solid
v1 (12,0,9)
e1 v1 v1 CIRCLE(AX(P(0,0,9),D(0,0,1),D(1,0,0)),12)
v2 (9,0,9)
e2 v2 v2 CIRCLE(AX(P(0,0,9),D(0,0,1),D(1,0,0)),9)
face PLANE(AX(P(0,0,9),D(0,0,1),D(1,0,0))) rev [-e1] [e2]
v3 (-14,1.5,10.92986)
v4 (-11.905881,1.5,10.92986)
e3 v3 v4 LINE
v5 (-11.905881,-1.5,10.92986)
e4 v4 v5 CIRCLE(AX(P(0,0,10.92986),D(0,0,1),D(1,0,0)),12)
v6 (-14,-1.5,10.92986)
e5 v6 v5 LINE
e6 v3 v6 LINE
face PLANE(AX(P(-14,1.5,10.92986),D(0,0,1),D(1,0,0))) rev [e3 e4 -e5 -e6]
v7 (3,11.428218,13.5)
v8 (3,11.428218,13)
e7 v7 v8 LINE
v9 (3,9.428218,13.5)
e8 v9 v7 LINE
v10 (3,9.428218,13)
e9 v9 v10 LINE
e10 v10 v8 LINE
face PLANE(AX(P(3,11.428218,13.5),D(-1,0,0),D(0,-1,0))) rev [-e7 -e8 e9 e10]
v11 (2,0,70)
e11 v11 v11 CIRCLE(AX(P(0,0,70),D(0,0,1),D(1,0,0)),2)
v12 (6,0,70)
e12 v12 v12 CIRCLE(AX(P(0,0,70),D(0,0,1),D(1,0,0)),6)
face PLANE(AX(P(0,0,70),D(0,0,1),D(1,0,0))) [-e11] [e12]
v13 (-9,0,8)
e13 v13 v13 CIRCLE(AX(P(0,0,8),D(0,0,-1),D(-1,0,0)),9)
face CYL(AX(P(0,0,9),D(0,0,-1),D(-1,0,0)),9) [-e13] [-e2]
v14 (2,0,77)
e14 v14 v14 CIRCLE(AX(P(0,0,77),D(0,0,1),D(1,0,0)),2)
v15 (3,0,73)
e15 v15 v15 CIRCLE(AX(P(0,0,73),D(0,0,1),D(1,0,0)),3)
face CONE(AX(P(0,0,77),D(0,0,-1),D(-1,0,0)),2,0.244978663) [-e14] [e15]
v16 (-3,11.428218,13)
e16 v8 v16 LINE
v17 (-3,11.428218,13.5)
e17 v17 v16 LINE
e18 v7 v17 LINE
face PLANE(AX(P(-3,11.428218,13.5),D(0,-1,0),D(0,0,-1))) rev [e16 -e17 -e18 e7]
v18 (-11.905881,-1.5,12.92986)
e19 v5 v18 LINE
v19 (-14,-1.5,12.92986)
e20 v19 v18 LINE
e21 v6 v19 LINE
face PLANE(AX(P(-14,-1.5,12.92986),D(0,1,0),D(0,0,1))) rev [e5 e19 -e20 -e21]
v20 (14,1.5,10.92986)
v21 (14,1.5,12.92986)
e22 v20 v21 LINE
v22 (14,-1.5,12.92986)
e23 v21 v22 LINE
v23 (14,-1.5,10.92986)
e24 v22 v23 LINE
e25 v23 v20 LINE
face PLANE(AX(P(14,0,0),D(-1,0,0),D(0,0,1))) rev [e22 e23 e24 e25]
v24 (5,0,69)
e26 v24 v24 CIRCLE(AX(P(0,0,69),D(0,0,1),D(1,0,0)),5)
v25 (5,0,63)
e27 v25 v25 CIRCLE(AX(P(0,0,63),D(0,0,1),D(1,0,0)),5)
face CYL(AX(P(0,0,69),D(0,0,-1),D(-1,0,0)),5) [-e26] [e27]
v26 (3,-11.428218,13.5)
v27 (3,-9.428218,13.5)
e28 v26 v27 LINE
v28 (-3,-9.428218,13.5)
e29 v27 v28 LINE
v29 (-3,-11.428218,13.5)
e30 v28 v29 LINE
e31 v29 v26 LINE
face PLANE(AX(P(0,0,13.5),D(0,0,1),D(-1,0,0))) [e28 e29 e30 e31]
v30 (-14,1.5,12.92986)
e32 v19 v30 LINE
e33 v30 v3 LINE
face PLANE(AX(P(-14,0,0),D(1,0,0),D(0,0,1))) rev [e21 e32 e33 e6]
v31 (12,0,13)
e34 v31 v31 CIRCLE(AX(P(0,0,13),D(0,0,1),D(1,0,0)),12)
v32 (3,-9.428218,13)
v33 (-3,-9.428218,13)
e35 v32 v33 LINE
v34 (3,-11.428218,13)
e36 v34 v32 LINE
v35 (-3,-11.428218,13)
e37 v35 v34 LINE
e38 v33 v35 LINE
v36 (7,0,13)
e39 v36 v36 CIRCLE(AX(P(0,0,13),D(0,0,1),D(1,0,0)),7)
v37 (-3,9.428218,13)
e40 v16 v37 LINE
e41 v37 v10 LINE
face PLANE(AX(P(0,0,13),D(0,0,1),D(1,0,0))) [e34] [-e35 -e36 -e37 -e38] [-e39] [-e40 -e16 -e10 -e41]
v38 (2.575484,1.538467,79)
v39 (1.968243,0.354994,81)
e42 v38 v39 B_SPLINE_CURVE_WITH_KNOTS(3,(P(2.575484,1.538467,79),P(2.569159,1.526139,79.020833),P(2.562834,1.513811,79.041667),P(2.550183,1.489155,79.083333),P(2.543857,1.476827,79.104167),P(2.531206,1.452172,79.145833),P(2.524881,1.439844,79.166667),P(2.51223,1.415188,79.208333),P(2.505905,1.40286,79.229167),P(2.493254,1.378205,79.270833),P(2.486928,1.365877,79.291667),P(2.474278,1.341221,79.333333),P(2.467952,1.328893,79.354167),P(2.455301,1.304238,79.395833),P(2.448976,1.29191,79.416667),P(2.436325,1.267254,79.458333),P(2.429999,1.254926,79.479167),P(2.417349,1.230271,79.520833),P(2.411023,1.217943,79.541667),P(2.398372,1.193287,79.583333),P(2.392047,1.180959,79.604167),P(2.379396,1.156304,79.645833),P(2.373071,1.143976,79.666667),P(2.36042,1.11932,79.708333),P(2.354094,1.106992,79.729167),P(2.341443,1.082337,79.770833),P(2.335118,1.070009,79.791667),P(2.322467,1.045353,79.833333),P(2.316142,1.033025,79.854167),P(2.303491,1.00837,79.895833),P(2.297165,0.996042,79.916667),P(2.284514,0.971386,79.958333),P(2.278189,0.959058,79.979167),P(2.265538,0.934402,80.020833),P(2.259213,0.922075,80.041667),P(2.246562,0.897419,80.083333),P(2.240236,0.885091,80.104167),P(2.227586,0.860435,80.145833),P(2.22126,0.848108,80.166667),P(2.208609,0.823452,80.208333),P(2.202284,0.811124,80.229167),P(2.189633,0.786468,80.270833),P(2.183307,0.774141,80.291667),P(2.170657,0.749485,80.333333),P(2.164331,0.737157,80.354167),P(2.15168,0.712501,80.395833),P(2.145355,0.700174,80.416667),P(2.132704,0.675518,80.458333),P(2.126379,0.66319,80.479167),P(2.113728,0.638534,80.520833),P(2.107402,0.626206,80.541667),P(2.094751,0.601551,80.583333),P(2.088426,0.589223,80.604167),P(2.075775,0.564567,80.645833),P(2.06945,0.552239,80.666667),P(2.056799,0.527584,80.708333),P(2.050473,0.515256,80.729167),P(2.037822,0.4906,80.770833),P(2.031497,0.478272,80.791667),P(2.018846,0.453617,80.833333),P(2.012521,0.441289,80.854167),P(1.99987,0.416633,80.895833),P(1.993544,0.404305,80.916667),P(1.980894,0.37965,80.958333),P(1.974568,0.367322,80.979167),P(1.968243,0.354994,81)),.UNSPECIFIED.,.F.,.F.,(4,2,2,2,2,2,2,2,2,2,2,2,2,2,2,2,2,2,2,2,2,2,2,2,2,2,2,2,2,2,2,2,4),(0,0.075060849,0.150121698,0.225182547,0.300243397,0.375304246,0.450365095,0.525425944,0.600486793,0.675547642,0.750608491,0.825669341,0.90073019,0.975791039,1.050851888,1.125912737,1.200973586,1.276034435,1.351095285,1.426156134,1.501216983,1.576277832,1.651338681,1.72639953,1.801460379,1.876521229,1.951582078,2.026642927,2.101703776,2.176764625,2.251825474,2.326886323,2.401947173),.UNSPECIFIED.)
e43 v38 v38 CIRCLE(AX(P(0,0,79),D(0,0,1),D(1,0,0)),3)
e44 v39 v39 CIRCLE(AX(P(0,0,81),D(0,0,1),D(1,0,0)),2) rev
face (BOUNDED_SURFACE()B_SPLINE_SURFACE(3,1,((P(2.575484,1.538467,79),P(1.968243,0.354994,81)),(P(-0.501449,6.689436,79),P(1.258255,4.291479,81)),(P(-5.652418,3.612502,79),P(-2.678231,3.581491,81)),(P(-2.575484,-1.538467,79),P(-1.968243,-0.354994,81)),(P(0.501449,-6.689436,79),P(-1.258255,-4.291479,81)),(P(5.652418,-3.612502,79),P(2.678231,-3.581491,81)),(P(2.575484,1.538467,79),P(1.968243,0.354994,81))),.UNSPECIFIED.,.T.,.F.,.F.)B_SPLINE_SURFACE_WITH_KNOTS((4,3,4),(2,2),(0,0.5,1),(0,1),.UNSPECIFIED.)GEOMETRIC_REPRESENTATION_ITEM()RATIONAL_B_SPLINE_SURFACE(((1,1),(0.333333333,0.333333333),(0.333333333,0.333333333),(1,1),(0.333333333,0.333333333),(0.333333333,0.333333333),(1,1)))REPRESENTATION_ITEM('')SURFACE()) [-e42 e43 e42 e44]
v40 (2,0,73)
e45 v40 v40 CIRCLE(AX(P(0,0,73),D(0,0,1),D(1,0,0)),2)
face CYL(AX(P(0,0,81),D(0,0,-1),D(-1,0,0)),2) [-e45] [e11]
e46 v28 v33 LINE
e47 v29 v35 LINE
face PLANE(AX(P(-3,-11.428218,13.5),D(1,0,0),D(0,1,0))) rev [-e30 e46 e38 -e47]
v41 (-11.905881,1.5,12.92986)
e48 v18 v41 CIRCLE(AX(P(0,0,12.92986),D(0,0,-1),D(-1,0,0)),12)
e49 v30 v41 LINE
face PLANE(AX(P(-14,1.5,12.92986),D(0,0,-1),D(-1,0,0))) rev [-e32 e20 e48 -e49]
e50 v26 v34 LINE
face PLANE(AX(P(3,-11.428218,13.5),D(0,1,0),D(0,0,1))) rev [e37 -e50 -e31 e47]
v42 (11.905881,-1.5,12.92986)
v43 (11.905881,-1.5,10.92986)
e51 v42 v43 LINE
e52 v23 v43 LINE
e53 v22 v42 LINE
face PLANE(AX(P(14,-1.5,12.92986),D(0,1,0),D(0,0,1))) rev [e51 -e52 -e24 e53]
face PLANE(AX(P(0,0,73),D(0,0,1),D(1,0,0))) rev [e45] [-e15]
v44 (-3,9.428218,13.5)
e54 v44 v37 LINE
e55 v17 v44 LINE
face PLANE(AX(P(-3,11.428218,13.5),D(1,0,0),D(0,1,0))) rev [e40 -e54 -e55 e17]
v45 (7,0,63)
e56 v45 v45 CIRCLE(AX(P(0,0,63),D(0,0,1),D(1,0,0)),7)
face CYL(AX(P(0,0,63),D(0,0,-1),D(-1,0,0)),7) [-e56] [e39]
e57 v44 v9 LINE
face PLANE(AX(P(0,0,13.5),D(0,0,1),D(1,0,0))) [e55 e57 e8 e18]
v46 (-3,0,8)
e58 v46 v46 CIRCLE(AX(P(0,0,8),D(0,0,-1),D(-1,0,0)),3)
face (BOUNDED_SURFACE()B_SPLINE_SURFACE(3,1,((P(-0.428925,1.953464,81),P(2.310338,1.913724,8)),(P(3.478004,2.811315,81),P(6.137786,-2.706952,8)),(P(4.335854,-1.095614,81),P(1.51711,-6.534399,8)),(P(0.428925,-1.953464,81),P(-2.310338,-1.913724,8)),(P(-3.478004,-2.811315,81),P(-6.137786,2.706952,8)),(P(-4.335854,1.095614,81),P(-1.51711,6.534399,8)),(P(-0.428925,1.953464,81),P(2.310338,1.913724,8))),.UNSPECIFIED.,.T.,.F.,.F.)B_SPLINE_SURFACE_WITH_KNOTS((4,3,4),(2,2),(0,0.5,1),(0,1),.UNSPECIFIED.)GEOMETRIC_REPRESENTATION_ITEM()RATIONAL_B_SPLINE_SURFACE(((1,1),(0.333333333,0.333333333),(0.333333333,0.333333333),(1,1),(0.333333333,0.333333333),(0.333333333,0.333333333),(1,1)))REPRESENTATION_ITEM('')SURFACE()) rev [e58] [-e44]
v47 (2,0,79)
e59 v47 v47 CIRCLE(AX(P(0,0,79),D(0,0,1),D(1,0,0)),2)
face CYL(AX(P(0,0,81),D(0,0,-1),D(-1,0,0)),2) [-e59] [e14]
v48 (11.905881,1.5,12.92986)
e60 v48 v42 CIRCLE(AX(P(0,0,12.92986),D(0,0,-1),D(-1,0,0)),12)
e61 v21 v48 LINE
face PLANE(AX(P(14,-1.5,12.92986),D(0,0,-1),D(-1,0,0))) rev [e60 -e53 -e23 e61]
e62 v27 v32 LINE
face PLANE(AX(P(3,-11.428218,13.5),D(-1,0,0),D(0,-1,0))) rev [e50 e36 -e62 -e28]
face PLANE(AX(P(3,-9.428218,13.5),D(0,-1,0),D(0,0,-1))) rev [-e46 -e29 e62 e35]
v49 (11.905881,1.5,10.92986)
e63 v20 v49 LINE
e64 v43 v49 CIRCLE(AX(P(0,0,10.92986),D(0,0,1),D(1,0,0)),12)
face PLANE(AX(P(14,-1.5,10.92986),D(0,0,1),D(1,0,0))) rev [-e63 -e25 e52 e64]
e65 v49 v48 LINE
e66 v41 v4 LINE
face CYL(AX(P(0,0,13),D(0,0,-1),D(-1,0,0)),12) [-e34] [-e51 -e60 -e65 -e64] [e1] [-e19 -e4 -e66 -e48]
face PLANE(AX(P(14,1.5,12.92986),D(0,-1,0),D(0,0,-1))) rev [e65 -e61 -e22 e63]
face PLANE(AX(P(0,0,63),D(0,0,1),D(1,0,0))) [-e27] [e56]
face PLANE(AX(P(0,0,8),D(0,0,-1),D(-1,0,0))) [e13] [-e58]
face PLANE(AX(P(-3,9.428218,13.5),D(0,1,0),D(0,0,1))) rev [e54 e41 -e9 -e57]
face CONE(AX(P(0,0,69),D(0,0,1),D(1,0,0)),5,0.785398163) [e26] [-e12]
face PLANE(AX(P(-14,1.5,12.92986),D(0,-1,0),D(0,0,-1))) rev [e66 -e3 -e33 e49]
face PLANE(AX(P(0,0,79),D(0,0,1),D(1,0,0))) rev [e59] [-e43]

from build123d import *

# Parameters (mm, degrees)
SKETCH1_R           = 9
BOSS_EXTRUDE1_DEPTH = 9
SKETCH2_R           = 7
BOSS_EXTRUDE2_DEPTH = 54
SKETCH3_R           = 12
BOSS_EXTRUDE3_DEPTH = 4
SKETCH4_R           = 5
BOSS_EXTRUDE4_DEPTH = 6
SKETCH5_R           = 2
BOSS_EXTRUDE5_DEPTH = 12
SKETCH6_R           = 6
SKETCH9_R           = 3
SKETCH8_R           = 2
SKETCH10_W          = 6
SKETCH10_H          = 2
BOSS_EXTRUDE6_DEPTH = 0.5
SKETCH11_W          = 2
SKETCH11_H          = 3
BOSS_EXTRUDE7_DEPTH = 3
CIRPATTERN2_COUNT   = 2
SKETCH12_R          = 9
CUT_EXTRUDE1_DEPTH  = 8


with BuildPart() as part:
    # Sketch1 → Boss-Extrude1 (new body)
    with BuildSketch(Plane.XY):
        Circle(SKETCH1_R)
    extrude(amount=BOSS_EXTRUDE1_DEPTH)

    # Sketch2 → Boss-Extrude2 (add)
    with BuildSketch(Plane.XY.offset(9)):
        Circle(SKETCH2_R)
    extrude(amount=BOSS_EXTRUDE2_DEPTH)

    # Sketch3 → Boss-Extrude3 (add)
    with BuildSketch(Plane.XY.offset(9)):
        Circle(SKETCH3_R)
    extrude(amount=BOSS_EXTRUDE3_DEPTH)

    # Sketch4 → Boss-Extrude4 (add)
    with BuildSketch(Plane.XY.offset(63)):
        Circle(SKETCH4_R)
    extrude(amount=BOSS_EXTRUDE4_DEPTH)

    # Sketch5 → Boss-Extrude5 (add)
    with BuildSketch(Plane.XY.offset(69)):
        Circle(SKETCH5_R)
    extrude(amount=BOSS_EXTRUDE5_DEPTH)

    # Sketch6 → section 0 of loft1
    with BuildSketch(Plane.XY.offset(70), mode=Mode.PRIVATE) as loft1_s0:
        Circle(SKETCH6_R)
    # loft up to a face of the part (loft1)
    loft([loft1_s0.sketch, Face(Wire([part.edges().sort_by_distance((-3.42273553, 3.644843137, 69))[0]]))])

    # Loft2: read off the stored shape, not the designer's step
    # Loft2: loft between two sections, ruled curve by curve
    loft2_from = [
        Edge.make_bspline([(2.575484484, 1.538466663, 79), (-0.501448843, 6.689435631, 79), (-5.652417811, 3.612502304, 79), (-2.575484484, -1.538466663, 79), (0.501448843, -6.689435631, 79), (5.652417811, -3.612502304, 79), (2.575484484, 1.538466663, 79)], [0, 0, 0, 0, 0.5, 0.5, 0.5, 1, 1, 1, 1], 3, [1, 0.333333333, 0.333333333, 1, 0.333333333, 0.333333333, 1]),
    ]
    loft2_to = [
        Edge.make_bspline([(1.968242689, 0.354993967, 81), (1.258254754, 4.291479346, 81), (-2.678230624, 3.581491411, 81), (-1.968242689, -0.354993967, 81), (-1.258254754, -4.291479346, 81), (2.678230624, -3.581491411, 81), (1.968242689, 0.354993967, 81)], [0, 0, 0, 0, 0.5, 0.5, 0.5, 1, 1, 1, 1], 3, [1, 0.333333333, 0.333333333, 1, 0.333333333, 0.333333333, 1]),
    ]
    loft2 = Solid(Shell([*[Face.make_surface_from_curves(loft2_from[k], loft2_to[k]) for k in range(1)], Face(Wire(loft2_from)), Face(Wire(loft2_to))]))
    add(loft2)

    # Sketch9 → Loft3 section 0
    with BuildSketch(Plane.XY.offset(73)):
        Circle(SKETCH9_R)
    # Sketch8 → Loft3 section 1
    with BuildSketch(Plane.XY.offset(77)):
        Circle(SKETCH8_R)
    loft()

    # Sketch10 → Boss-Extrude6 (add)
    with BuildSketch(Plane.XY.offset(13)):
        with Locations((0, 10.428217705)):
            Rectangle(SKETCH10_W, SKETCH10_H)
    boss_extrude6 = extrude(amount=BOSS_EXTRUDE6_DEPTH)

    # Sketch11 → Boss-Extrude7 (add)
    with BuildSketch(Plane(origin=(11, 0, 0), x_dir=(0, 0, -1), z_dir=(1, 0, 0))):
        with Locations((-11.929859907, 0)):
            Rectangle(SKETCH11_W, SKETCH11_H)
    boss_extrude7 = extrude(amount=BOSS_EXTRUDE7_DEPTH)

    # CirPattern2: Boss-Extrude6, Boss-Extrude7 ×2 about axis
    cirpattern2_axis = Axis((0, 0, 0), (0, 0, 1))
    add([boss_extrude6.rotate(cirpattern2_axis, i * 360 / CIRPATTERN2_COUNT) for i in range(1, CIRPATTERN2_COUNT)])
    add([boss_extrude7.rotate(cirpattern2_axis, i * 360 / CIRPATTERN2_COUNT) for i in range(1, CIRPATTERN2_COUNT)])

    # Sketch12 → Cut-Extrude1 (cut)
    with BuildSketch(Plane(origin=(0, 0, 0), x_dir=(-1, 0, 0), z_dir=(0, 0, -1))):
        Circle(SKETCH12_R)
    extrude(amount=-CUT_EXTRUDE1_DEPTH, mode=Mode.SUBTRACT)

    # Cut-Loft1: read off the stored shape, not the designer's step
    # Cut-Loft1: loft between two sections, ruled curve by curve
    cut_loft1_from = [
        Edge.make_bspline([(-0.428925161, 1.953464411, 81), (3.478003662, 2.811314733, 81), (4.335853984, -1.09561409, 81), (0.428925161, -1.953464411, 81), (-3.478003662, -2.811314733, 81), (-4.335853984, 1.09561409, 81), (-0.428925161, 1.953464411, 81)], [0, 0, 0, 0, 0.5, 0.5, 0.5, 1, 1, 1, 1], 3, [1, 0.333333333, 0.333333333, 1, 0.333333333, 0.333333333, 1]),
    ]
    cut_loft1_to = [
        Edge.make_bspline([(2.310337756, 1.913723975, 8), (6.137785706, -2.706951537, 8), (1.517110194, -6.534399487, 8), (-2.310337756, -1.913723975, 8), (-6.137785706, 2.706951537, 8), (-1.517110194, 6.534399487, 8), (2.310337756, 1.913723975, 8)], [0, 0, 0, 0, 0.5, 0.5, 0.5, 1, 1, 1, 1], 3, [1, 0.333333333, 0.333333333, 1, 0.333333333, 0.333333333, 1]),
    ]
    cut_loft1 = Solid(Shell([*[Face.make_surface_from_curves(cut_loft1_from[k], cut_loft1_to[k]) for k in range(1)], Face(Wire(cut_loft1_from)), Face(Wire(cut_loft1_to))]))
    add(cut_loft1, mode=Mode.SUBTRACT)


solid = part.part
